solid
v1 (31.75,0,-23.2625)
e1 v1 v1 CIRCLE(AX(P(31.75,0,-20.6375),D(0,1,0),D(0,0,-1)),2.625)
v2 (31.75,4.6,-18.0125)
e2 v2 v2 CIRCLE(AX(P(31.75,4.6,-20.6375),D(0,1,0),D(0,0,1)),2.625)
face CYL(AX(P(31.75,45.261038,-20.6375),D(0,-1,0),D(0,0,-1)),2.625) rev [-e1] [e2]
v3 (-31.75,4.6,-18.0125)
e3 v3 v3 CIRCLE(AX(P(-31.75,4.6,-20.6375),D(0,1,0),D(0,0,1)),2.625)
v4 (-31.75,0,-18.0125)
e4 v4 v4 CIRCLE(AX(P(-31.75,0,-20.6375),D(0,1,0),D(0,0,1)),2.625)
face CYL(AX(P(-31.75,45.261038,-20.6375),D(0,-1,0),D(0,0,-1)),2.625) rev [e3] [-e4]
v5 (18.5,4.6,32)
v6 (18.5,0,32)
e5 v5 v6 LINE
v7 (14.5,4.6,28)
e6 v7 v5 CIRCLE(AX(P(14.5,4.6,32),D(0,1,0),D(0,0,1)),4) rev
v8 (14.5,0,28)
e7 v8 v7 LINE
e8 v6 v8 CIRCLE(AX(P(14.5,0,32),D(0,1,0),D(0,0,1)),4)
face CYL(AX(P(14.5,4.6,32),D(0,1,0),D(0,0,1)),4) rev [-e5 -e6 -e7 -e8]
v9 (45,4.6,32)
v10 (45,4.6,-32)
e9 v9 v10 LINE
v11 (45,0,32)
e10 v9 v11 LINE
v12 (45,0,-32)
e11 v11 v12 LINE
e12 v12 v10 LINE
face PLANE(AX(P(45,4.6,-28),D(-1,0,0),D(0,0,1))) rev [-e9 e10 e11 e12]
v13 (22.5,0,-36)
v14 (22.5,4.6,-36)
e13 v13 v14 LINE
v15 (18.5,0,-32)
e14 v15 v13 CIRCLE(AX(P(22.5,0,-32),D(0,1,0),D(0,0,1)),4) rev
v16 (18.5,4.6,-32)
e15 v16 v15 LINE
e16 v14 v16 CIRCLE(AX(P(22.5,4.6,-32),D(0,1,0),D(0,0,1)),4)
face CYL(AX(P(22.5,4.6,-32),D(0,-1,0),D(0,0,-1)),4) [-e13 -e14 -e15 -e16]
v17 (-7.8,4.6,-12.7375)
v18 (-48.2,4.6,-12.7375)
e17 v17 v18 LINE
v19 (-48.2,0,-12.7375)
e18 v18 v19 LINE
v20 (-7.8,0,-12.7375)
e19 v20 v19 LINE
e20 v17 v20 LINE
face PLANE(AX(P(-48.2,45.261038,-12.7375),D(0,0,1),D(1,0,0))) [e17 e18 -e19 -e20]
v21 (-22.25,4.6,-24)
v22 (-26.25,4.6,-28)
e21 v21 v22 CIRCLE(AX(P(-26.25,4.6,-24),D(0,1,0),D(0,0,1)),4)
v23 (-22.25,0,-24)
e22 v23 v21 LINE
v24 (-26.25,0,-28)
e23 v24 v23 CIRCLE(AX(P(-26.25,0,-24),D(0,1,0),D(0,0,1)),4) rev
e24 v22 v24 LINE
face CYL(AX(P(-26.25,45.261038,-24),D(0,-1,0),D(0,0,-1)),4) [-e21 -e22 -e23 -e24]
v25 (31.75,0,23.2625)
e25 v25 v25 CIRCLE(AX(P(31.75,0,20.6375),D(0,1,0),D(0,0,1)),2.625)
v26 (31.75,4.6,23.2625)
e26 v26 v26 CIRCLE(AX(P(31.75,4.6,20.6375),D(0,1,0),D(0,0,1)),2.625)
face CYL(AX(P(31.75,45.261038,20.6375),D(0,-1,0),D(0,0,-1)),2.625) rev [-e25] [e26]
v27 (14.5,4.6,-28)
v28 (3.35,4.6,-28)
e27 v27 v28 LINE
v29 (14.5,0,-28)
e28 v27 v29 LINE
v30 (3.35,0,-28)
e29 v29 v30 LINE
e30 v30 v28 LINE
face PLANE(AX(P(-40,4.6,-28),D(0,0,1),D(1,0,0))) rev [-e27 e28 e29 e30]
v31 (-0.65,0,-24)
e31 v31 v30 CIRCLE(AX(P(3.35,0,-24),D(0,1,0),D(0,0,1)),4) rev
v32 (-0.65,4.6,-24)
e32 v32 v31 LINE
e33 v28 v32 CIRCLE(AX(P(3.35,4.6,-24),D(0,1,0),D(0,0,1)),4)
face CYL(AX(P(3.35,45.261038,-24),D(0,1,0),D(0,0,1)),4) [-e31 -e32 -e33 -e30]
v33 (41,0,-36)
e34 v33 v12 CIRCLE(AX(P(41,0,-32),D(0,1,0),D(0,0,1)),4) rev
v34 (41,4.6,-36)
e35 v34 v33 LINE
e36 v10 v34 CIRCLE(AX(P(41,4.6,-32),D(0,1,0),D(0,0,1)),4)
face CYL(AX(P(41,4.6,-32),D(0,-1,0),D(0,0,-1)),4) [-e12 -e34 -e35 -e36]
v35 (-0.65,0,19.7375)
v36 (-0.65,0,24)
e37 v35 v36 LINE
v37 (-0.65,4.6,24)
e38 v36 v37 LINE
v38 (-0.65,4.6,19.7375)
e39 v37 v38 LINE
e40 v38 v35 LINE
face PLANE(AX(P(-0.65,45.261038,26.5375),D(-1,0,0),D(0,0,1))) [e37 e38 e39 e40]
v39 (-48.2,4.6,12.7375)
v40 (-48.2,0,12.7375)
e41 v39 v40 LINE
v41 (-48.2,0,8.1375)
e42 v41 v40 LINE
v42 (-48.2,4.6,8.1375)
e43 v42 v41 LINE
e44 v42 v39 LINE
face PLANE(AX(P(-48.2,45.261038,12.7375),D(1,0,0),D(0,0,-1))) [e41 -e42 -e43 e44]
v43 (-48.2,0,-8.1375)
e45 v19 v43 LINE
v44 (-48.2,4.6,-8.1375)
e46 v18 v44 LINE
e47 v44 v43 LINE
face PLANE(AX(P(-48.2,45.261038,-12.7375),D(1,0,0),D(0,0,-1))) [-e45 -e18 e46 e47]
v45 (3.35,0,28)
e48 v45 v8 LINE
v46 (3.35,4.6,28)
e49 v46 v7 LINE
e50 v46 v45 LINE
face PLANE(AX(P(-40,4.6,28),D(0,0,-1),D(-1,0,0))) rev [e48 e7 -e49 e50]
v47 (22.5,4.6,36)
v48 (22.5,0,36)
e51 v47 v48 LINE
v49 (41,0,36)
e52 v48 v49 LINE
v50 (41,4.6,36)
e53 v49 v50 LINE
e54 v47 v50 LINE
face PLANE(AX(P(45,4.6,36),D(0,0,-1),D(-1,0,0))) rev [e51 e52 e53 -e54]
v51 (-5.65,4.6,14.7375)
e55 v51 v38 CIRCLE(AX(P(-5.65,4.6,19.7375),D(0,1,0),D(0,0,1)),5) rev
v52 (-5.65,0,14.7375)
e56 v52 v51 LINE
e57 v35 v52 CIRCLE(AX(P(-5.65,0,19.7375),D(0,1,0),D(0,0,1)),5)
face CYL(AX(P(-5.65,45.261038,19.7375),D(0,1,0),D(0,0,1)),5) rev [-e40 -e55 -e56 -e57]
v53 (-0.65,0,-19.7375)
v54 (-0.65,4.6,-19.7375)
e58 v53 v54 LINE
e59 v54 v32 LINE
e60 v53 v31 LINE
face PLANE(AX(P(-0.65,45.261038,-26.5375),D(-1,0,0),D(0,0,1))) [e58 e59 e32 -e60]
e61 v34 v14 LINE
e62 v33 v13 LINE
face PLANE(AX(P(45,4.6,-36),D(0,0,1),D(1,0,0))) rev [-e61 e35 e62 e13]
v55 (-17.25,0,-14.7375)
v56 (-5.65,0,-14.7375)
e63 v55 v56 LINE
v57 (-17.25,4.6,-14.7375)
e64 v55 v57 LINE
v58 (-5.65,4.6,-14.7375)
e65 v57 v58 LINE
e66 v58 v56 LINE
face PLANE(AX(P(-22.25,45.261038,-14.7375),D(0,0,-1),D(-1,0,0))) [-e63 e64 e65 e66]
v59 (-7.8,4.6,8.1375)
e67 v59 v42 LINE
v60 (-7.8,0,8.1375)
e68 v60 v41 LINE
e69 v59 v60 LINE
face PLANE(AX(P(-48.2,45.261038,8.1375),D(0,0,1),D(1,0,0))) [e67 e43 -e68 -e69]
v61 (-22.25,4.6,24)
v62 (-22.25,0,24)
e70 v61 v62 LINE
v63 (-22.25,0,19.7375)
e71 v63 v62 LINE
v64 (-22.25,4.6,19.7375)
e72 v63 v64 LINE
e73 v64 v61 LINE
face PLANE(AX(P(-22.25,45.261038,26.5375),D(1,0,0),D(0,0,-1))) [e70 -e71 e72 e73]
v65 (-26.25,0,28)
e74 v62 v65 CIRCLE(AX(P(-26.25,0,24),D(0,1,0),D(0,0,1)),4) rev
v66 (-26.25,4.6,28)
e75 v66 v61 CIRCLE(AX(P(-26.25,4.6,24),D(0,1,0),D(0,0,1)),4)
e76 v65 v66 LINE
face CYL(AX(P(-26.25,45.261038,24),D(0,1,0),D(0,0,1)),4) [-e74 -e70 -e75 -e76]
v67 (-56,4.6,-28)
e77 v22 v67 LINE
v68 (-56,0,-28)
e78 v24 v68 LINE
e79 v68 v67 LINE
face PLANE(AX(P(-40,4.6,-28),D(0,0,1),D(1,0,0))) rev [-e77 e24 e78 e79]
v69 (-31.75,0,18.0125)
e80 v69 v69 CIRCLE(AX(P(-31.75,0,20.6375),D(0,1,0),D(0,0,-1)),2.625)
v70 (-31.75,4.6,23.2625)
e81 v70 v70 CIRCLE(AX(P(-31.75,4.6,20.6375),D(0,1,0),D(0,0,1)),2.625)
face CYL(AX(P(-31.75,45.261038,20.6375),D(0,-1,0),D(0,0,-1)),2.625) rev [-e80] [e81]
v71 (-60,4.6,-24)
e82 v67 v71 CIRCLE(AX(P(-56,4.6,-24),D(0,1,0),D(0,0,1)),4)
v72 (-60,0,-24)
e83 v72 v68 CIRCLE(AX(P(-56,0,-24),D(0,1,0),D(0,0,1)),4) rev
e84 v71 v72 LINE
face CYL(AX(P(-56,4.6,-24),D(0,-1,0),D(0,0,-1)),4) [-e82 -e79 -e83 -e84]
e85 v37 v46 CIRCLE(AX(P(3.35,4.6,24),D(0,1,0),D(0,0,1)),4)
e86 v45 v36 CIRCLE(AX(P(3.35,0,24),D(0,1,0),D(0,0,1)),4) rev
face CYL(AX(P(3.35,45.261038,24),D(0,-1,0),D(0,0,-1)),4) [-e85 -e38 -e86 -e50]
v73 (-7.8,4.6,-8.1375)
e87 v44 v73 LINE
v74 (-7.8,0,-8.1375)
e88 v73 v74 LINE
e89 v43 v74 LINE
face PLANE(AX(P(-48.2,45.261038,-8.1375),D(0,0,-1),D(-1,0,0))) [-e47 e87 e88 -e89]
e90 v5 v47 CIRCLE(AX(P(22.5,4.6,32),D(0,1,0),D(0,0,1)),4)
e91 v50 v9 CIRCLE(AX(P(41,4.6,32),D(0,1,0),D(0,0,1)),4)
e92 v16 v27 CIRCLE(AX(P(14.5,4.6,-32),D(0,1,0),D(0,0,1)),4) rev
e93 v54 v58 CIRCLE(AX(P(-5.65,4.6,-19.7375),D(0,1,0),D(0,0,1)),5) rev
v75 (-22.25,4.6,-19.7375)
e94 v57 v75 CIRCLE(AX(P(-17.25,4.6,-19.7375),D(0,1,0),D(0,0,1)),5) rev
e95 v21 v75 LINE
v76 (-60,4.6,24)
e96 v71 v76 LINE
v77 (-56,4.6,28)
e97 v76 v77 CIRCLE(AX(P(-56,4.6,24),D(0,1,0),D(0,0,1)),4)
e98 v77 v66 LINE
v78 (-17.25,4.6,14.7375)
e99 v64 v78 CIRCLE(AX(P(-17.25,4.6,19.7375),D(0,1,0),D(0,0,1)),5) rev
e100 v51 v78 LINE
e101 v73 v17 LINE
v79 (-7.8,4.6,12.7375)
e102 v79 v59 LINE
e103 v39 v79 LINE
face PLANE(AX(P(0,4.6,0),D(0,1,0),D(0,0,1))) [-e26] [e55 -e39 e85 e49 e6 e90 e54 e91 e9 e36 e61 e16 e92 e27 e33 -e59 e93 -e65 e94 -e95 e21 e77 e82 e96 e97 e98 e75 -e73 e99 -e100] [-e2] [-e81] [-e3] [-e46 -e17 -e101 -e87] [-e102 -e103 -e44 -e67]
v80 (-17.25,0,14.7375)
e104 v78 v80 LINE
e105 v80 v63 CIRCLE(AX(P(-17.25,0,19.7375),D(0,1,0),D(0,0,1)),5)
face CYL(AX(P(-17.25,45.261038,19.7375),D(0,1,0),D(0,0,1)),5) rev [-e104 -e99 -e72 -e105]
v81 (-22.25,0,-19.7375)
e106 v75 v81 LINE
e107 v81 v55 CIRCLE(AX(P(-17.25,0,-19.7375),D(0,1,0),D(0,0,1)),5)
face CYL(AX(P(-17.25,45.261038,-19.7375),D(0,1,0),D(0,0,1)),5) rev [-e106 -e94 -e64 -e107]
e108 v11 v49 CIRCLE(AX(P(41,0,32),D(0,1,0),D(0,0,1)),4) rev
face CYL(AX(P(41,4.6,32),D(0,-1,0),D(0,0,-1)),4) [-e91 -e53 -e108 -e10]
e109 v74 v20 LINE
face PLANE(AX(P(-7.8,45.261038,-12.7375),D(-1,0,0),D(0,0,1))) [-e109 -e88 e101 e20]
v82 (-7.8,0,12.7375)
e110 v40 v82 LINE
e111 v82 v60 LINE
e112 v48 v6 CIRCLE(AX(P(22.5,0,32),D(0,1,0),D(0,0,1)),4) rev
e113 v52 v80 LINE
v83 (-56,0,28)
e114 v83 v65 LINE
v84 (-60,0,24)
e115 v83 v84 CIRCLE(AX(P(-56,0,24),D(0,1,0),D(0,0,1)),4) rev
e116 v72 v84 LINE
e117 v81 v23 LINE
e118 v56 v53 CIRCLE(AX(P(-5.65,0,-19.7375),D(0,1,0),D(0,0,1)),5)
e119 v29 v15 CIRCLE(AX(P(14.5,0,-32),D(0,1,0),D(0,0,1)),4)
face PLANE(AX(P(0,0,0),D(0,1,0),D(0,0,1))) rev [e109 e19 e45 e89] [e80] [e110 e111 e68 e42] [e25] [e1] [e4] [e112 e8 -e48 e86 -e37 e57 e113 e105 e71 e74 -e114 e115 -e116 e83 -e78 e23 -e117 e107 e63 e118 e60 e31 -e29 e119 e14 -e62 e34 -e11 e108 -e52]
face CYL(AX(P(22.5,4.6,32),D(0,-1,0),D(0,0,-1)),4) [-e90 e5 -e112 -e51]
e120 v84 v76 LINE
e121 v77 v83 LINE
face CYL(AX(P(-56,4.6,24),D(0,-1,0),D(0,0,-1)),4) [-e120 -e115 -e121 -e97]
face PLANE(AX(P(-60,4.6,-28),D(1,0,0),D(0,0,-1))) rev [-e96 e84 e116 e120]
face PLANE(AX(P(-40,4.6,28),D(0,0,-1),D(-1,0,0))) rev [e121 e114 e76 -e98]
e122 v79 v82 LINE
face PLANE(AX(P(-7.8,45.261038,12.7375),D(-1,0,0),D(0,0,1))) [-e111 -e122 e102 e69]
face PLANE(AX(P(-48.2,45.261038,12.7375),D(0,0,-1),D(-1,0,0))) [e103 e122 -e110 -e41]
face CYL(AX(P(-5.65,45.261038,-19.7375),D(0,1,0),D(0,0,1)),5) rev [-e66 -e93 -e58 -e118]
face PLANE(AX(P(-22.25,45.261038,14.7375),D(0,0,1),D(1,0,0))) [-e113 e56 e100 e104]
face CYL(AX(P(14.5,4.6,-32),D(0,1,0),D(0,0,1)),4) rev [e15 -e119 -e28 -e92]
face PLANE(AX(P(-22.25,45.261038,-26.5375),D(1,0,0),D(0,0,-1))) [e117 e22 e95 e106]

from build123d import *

# Parameters (mm, degrees)
EXTRUDE_1_DEPTH     = 4.6
SKETCH_1_R          = 2.625
SKETCH_1_W          = 40.4
SKETCH_1_H          = 4.6
CUT_EXTRUDE_1_DEPTH = 4.6
FILLET_1_R          = 5
FILLET_2_R          = 4


with BuildPart() as part:
    # 草图3 → 凸台-拉伸1 (new body)
    with BuildSketch(Plane(origin=(0, 0, 0), x_dir=(1, 0, 0), z_dir=(0, 1, 0))):
        Polygon((-40, 28), (-60, 28), (-60, -28), (-40, -28), (18.5, -28), (18.5, -36), (45, -36), (45, -28), (45, 28), (45, 36), (18.5, 36), (18.5, 28), align=None)
    extrude(amount=EXTRUDE_1_DEPTH)

    # 草图1 → 切除-拉伸1 (cut)
    with BuildSketch(Plane(origin=(0, 0, 0), x_dir=(1, 0, 0), z_dir=(0, 1, 0))):
        with Locations(Location((-31.75, 20.6375, 0), (0, 0, 270))):
            Circle(SKETCH_1_R)
        with Locations(Location((31.75, 20.6375, 0), (0, 0, 90))):
            Circle(SKETCH_1_R)
        with Locations(Location((31.75, -20.6375, 0), (0, 0, 270))):
            Circle(SKETCH_1_R)
        with Locations(Location((-31.75, -20.6375, 0), (0, 0, 90))):
            Circle(SKETCH_1_R)
        with Locations((-28, -10.4375)):
            Rectangle(SKETCH_1_W, SKETCH_1_H)
        with Locations((-28, 10.4375)):
            Rectangle(SKETCH_1_W, SKETCH_1_H)
        Polygon((-22.25, -26.5375), (-22.25, -14.7375), (-0.65, -14.7375), (-0.65, -26.5375), (-0.65, -30.009482824), (-22.25, -30.009482824), align=None)
        Polygon((-22.25, 14.7375), (-0.65, 14.7375), (-0.65, 26.5375), (-0.65, 30.009482824), (-22.25, 30.009482824), (-22.25, 26.5375), align=None)
    extrude(amount=CUT_EXTRUDE_1_DEPTH, mode=Mode.SUBTRACT)

    # 圆角1
    fillet_1_edges = [part.edges().sort_by_distance(p)[0] for p in [
        (-22.25, 2.3, 14.7375),
        (-0.65, 2.3, 14.7375),
        (-0.65, 2.3, -14.7375),
        (-22.25, 2.3, -14.7375),
    ]]
    fillet(fillet_1_edges, radius=FILLET_1_R)

    # 圆角2
    fillet_2_edges = [part.edges().sort_by_distance(p)[0] for p in [
        (-0.65, 2.3, 28),
        (-22.25, 2.3, 28),
        (-0.65, 2.3, -28),
        (-22.25, 2.3, -28),
        (-60, 2.3, 28),
        (-60, 2.3, -28),
        (18.5, 2.3, -28),
        (18.5, 2.3, -36),
        (45, 2.3, -36),
        (45, 2.3, 36),
        (18.5, 2.3, 36),
        (18.5, 2.3, 28),
    ]]
    fillet(fillet_2_edges, radius=FILLET_2_R - 0.0001)  # a hair under: the kernel refuses the full size


solid = part.part
